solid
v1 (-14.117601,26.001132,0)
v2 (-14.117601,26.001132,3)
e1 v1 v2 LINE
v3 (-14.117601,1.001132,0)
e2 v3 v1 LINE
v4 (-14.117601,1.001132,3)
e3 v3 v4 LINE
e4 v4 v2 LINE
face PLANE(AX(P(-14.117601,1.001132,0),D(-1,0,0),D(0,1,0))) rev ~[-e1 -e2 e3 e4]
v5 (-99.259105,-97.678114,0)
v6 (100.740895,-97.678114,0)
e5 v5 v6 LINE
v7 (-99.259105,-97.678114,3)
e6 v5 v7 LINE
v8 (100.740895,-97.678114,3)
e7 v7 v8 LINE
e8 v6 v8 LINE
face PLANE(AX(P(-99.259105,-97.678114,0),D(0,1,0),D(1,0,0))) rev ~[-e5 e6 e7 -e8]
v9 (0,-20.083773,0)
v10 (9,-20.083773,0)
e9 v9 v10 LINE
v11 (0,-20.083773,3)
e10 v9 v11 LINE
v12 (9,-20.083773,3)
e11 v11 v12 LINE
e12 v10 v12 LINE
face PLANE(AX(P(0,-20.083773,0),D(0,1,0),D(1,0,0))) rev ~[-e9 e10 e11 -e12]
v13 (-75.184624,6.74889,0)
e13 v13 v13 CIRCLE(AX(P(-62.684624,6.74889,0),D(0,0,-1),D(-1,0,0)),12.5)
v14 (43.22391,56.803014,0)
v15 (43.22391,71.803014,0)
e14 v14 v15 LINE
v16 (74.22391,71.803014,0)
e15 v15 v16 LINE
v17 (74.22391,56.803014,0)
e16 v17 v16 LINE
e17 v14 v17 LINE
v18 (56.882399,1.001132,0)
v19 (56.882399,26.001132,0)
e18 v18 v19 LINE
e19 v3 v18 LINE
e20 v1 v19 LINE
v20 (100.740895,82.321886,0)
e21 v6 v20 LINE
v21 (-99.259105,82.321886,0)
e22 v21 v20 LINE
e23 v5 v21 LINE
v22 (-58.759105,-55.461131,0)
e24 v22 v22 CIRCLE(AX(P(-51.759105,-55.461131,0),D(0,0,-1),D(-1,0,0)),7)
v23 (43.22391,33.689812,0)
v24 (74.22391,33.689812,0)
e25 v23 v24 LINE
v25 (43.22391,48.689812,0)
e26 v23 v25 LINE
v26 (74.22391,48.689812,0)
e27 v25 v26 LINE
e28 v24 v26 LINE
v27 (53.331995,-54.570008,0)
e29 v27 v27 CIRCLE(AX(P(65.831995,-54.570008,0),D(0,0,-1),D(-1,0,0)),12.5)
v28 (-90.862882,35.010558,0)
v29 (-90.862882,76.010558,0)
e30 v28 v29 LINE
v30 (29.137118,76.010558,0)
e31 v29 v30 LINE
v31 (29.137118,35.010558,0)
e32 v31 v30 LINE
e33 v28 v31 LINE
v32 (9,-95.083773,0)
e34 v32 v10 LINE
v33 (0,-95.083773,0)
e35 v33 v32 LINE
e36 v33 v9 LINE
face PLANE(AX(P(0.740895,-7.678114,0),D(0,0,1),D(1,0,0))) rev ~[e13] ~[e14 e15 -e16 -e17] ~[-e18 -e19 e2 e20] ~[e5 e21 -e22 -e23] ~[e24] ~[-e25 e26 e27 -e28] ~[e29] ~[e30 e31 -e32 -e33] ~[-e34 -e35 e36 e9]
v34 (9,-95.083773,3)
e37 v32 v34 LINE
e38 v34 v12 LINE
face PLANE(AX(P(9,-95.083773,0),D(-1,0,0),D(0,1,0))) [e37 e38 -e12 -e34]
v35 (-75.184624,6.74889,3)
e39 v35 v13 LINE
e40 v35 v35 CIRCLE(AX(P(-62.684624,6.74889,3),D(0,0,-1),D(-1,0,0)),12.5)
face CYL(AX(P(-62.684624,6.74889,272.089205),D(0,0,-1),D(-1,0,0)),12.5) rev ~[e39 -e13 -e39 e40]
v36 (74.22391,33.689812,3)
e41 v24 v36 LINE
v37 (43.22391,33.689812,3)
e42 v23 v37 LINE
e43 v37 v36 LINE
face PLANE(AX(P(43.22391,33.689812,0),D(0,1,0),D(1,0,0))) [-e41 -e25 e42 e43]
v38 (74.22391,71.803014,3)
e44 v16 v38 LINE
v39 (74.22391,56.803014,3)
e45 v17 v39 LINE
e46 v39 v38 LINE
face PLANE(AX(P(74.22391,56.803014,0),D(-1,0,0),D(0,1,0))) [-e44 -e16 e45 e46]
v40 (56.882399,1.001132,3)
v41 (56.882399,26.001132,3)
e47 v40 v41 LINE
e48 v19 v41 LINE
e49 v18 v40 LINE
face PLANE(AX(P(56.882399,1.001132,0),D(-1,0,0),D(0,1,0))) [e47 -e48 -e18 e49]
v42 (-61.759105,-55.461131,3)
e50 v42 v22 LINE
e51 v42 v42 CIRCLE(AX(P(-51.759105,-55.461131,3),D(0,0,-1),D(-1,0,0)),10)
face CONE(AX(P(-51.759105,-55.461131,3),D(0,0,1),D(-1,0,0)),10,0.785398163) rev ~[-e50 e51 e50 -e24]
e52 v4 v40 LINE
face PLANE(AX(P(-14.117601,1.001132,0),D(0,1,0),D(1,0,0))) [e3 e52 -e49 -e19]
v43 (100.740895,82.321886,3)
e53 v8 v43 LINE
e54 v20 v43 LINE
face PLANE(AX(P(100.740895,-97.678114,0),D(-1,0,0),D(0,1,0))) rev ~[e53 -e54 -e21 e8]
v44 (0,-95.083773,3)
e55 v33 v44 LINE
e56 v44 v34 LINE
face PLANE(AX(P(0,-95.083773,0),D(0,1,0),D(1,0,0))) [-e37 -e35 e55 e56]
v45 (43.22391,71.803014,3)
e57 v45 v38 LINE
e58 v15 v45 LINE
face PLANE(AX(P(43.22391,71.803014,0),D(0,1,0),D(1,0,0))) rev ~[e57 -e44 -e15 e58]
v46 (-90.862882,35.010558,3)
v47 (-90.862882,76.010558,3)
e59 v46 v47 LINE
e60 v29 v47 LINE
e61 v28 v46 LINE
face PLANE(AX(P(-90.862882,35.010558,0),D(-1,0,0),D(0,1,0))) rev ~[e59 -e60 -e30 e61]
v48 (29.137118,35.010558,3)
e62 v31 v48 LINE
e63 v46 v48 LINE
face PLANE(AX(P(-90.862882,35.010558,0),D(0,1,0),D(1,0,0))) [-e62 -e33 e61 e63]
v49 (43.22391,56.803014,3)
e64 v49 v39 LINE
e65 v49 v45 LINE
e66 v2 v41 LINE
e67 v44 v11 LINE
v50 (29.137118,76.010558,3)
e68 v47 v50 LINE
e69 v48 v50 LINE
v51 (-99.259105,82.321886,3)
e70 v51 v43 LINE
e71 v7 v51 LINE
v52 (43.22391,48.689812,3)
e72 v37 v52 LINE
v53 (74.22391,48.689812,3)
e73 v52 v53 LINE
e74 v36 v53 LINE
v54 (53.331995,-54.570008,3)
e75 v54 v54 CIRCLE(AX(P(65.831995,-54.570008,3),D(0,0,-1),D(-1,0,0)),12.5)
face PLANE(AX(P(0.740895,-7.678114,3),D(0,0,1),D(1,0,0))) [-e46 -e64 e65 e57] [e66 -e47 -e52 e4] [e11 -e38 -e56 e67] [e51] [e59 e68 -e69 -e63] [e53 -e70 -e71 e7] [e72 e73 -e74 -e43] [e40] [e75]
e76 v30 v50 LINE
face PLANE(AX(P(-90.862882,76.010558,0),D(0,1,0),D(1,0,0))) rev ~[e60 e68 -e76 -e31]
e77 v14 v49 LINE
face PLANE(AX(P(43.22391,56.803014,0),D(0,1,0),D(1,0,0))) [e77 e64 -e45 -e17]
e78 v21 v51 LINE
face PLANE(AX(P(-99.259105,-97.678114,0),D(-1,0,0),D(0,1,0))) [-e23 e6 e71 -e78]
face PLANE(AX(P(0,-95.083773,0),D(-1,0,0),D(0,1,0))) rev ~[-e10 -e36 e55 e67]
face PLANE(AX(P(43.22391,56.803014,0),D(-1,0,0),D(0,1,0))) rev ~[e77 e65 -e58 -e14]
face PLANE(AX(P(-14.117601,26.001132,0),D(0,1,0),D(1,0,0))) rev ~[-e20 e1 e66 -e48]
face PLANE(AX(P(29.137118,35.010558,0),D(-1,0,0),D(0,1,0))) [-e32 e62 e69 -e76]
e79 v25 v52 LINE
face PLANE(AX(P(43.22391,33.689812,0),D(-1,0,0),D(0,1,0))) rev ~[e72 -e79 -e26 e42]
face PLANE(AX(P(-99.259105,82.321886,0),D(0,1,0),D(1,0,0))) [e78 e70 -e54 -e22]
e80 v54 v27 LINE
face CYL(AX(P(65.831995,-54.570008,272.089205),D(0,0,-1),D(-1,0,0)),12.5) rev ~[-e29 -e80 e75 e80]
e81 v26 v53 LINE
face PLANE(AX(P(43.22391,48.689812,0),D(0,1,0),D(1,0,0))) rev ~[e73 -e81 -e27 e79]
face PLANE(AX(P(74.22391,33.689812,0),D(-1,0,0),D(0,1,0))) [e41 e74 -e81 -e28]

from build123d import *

# Parameters (mm, degrees)
F0_W           = 200
F0_H           = 180
F0_W_2         = 9
F0_H_2         = 75
F0_W_3         = 120
F0_H_3         = 41
F0_W_4         = 71
F0_H_4         = 25
F0_W_5         = 31
F0_H_5         = 15
F1_DEPTH       = 3
F4_D           = 8.8
F4_CSINK_D     = 20
F4_CSINK_ANGLE = 90
F5_D           = 25
F6_D           = 25


# Not quite as in the source:
# - a feature of the source that left no trace in its solid (it failed there, or was rolled back) is left out
# - the program builds the solid bodies; features that only make, move or delete a surface that nothing else refers to are left out


with BuildPart() as f1:
    # F0 (on Top) → F1 (new body)
    with BuildSketch(Plane.XY):
        with Locations((0.7408946753, -7.6781137288)):
            Rectangle(F0_W, F0_H)
        with Locations((4.5, -57.5837731361)):
            Rectangle(F0_W_2, F0_H_2, mode=Mode.SUBTRACT)
        with Locations((-30.8628822118, 55.5105576217)):
            Rectangle(F0_W_3, F0_H_3, mode=Mode.SUBTRACT)
        with Locations((21.3823994361, 13.5011318373)):
            Rectangle(F0_W_4, F0_H_4, mode=Mode.SUBTRACT)
        with Locations((58.7239102691, 41.1898118258)):
            Rectangle(F0_W_5, F0_H_5, mode=Mode.SUBTRACT)
        with Locations((58.7239102691, 64.3030141294)):
            Rectangle(F0_W_5, F0_H_5, mode=Mode.SUBTRACT)
    extrude(amount=F1_DEPTH)

    # F4 (through all)
    with Locations(Plane.XY.offset(3)):
        with Locations((-51.7591053247, -55.4611310363)):
            CounterSinkHole(F4_D / 2, F4_CSINK_D / 2, counter_sink_angle=F4_CSINK_ANGLE)

    # F5 (through all)
    with Locations(Plane.XY.offset(3)):
        with Locations((65.8319948756, -54.5700079396)):
            Hole(F5_D / 2)

    # F6 (through all)
    with Locations(Plane.XY.offset(3)):
        with Locations((-62.68462408, 6.748889561)):
            Hole(F6_D / 2)


solid = f1.part
